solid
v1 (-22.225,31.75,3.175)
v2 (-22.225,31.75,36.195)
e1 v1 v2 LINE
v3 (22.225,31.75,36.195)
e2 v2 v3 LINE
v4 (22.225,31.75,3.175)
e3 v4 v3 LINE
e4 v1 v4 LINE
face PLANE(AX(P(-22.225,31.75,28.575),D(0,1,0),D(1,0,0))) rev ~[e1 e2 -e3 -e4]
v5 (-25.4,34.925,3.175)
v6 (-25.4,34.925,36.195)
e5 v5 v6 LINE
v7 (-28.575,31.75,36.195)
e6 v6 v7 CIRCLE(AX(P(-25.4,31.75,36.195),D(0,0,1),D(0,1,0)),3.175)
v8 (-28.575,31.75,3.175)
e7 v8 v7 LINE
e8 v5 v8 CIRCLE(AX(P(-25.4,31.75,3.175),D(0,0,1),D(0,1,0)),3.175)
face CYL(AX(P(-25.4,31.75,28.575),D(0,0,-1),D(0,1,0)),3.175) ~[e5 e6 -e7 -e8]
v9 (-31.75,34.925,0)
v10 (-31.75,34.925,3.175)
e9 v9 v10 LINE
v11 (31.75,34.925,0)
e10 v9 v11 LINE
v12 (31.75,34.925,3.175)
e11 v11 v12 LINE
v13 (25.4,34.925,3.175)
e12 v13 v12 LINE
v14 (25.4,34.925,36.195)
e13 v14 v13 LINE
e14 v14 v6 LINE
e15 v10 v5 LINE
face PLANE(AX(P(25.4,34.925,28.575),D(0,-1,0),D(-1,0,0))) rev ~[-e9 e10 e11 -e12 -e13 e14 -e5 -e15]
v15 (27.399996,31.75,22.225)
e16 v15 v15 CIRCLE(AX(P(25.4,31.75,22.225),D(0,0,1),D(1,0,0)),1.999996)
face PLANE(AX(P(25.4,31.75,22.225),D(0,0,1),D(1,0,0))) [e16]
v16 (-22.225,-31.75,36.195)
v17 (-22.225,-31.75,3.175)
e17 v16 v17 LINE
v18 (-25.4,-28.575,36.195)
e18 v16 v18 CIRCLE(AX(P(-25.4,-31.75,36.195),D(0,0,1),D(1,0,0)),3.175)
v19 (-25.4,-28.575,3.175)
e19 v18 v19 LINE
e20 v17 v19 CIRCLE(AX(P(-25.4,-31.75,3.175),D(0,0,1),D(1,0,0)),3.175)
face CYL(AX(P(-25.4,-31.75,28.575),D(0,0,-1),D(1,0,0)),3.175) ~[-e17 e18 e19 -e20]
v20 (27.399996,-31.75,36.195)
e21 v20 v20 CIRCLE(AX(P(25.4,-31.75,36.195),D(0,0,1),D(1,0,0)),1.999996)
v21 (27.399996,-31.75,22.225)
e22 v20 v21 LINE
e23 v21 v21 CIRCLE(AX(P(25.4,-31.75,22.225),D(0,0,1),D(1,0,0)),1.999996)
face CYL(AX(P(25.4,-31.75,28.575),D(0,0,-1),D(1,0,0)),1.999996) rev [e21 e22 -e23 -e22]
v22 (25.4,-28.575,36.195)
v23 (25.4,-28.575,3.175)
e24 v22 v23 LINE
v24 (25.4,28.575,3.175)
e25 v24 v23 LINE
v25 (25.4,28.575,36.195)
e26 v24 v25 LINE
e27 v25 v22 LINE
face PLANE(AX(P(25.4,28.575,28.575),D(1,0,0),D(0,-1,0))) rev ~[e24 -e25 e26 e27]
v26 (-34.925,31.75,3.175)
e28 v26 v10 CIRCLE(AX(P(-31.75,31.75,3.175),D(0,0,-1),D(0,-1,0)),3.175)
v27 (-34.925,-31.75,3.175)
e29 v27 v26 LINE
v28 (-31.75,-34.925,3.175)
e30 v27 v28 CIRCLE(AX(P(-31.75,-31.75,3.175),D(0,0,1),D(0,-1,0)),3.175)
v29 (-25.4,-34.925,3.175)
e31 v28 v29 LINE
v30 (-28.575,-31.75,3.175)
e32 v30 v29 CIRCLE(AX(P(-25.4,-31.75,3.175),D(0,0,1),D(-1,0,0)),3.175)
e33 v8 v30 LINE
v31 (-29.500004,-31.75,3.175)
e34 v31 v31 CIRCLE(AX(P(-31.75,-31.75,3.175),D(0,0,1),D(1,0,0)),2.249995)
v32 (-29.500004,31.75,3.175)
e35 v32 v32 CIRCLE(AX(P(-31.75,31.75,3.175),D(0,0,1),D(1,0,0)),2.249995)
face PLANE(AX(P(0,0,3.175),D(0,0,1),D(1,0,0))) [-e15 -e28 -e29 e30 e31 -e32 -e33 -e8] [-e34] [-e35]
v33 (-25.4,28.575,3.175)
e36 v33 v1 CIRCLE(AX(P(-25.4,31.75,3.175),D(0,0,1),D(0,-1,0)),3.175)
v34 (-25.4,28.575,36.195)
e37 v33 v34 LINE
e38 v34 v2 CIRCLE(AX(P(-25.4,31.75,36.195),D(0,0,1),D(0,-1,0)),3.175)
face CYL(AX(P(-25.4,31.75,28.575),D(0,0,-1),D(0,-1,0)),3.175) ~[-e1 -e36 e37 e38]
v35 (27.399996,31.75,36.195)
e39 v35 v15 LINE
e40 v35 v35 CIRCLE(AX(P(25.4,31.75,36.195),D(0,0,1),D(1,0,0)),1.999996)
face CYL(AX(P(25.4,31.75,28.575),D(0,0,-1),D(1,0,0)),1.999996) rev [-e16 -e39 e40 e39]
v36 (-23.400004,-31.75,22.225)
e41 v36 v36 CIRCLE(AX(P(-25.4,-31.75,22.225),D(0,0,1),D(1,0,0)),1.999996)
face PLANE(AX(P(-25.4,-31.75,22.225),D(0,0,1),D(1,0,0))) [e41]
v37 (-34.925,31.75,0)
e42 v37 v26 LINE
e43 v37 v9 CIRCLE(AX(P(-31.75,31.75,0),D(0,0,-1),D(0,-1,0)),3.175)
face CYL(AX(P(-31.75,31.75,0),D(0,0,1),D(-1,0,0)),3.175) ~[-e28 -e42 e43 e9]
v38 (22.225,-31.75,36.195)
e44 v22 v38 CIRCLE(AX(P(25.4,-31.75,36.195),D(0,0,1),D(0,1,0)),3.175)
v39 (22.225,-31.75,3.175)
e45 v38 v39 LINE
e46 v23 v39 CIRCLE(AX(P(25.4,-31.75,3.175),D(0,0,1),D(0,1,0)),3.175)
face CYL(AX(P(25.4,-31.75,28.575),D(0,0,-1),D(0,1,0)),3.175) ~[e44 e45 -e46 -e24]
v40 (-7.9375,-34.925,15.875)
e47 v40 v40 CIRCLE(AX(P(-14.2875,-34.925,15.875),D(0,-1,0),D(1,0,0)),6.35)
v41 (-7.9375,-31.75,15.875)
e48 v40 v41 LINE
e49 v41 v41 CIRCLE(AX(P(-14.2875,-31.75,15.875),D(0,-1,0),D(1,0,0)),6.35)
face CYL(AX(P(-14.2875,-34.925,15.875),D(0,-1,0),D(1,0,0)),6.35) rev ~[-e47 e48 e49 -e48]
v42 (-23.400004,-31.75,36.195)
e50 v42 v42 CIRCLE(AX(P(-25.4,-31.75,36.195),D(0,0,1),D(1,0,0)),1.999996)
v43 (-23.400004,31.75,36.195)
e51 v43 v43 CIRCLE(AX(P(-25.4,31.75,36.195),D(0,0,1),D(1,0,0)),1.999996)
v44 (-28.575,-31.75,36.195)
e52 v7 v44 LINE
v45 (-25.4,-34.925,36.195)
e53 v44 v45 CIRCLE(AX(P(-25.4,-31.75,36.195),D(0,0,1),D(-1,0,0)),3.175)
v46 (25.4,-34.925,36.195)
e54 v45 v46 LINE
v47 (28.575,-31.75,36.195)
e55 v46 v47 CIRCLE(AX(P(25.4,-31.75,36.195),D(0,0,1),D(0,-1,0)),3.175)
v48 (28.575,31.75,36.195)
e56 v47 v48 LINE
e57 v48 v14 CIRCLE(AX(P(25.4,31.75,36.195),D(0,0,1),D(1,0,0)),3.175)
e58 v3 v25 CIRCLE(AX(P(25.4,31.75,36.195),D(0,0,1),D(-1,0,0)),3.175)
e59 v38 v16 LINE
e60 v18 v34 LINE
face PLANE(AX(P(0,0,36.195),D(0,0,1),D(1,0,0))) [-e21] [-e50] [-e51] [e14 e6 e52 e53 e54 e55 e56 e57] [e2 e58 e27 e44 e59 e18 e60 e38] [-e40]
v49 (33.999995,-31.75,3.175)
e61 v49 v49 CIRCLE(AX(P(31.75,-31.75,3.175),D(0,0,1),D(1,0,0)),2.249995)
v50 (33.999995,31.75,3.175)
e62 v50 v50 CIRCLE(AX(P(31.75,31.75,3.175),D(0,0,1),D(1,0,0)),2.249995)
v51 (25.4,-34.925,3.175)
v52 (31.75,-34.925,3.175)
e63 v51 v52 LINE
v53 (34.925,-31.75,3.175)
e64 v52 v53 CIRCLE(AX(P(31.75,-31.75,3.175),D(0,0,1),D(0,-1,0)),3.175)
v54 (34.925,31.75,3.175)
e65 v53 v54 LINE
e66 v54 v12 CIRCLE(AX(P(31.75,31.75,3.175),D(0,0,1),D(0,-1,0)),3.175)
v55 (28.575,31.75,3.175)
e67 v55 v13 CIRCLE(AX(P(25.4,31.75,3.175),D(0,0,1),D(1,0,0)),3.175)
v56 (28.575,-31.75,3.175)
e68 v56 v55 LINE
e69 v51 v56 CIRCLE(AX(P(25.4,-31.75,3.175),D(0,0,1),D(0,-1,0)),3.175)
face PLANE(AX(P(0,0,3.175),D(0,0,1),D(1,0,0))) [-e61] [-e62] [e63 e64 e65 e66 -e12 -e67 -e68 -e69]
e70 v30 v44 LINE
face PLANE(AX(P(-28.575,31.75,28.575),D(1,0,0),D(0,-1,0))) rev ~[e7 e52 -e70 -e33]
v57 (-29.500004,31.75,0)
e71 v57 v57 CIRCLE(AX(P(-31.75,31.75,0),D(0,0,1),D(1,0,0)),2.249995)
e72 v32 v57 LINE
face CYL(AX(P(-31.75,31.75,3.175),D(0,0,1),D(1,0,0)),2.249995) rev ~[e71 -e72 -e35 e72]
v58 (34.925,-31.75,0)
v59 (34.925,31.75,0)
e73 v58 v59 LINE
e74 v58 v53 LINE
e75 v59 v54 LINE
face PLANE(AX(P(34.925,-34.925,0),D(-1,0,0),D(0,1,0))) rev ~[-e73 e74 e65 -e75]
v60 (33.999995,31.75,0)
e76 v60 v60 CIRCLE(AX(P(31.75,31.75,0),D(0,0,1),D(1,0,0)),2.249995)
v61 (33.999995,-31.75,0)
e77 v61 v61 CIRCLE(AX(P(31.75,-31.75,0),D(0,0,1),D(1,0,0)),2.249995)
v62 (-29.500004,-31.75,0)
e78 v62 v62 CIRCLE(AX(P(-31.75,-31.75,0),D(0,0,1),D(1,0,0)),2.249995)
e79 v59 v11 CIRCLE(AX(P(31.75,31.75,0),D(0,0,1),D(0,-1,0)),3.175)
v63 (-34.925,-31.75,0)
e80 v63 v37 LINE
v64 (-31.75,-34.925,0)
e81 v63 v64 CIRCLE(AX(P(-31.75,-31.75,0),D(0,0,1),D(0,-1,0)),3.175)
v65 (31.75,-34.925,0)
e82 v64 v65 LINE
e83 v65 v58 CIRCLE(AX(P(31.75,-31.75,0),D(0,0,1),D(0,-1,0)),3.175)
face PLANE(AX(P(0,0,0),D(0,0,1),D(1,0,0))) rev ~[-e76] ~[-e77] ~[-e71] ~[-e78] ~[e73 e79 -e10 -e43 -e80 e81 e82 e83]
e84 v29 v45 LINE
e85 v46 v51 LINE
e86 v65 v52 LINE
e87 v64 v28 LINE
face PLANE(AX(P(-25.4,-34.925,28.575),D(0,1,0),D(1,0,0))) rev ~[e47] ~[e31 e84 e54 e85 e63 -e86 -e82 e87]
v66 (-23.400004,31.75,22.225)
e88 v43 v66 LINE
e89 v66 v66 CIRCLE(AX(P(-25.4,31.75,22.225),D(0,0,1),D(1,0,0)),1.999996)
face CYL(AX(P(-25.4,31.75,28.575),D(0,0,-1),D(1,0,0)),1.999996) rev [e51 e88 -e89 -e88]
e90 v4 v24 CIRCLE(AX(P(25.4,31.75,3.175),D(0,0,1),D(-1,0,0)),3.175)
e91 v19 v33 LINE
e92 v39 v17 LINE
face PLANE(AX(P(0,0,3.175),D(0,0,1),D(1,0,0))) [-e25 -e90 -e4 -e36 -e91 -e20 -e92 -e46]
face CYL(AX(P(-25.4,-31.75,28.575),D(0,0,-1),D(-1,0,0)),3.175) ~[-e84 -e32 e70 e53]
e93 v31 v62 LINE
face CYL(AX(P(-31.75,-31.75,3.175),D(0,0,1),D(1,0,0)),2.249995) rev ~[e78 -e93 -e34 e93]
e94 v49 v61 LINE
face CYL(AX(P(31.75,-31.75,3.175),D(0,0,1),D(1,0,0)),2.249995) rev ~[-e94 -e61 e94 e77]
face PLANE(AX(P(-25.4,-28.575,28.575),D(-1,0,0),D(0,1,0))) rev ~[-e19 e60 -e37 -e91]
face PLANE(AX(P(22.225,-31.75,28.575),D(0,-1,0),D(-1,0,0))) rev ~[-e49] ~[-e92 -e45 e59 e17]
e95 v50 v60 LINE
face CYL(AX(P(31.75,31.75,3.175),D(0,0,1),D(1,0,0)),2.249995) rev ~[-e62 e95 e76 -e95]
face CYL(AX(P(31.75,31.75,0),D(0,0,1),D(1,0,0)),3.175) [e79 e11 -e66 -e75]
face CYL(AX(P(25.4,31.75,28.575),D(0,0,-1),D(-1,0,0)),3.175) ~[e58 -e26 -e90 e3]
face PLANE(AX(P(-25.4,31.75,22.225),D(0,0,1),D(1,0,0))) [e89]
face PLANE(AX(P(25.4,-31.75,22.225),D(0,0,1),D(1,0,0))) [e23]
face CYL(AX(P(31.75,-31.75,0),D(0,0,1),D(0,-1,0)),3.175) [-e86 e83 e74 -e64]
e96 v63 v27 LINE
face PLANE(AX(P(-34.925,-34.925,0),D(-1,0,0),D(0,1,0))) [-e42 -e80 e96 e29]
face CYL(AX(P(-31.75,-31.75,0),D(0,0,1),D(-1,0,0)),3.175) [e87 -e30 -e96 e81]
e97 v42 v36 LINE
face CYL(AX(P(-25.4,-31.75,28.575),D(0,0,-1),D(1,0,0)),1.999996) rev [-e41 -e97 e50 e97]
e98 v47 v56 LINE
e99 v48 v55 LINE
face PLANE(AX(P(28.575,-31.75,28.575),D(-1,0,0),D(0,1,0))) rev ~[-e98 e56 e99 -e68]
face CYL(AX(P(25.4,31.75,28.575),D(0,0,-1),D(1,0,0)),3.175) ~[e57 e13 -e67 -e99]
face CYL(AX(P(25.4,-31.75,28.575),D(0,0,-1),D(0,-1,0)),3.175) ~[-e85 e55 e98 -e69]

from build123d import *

# Parameters (mm, degrees)
F0_W          = 69.85
F0_H          = 69.85
F1_DEPTH      = 3.175
F2_R          = 3.175
F3_R          = 2.2499955
F4_DEPTH      = 25.4
F4_DEPTH_BACK = 101
F6_DEPTH      = 25.4
F7_R          = 1.999996
F8_DEPTH      = 6.35
F9_R          = 6.35
F10_DEPTH     = 3.175
F11_DEPTH     = 7.62


# Not quite as in the source:
# - an extrude ends at something that could not be found from the text; its depth is read off the source's solid


with BuildPart() as f1:
    # F0 (on Top) → F1 (new body)
    with BuildSketch(Plane.XY):
        Rectangle(F0_W, F0_H)
    extrude(amount=F1_DEPTH)

    # F2
    f2_edges = [f1.edges().sort_by_distance(p)[0] for p in [
        (-34.925, -34.925, 1.5875),
        (34.925, -34.925, 1.5875),
        (34.925, 34.925, 1.5875),
        (-34.925, 34.925, 1.5875),
    ]]
    fillet(f2_edges, radius=F2_R)

    # F3 (on face) → F4 (cut, two sides)
    with BuildSketch(Plane.XY.offset(3.175)) as f4_sk:
        with Locations((-31.75, 31.75)):
            Circle(F3_R)
        with Locations((31.75, 31.75)):
            Circle(F3_R)
        with Locations((31.75, -31.75)):
            Circle(F3_R)
        with Locations((-31.75, -31.75)):
            Circle(F3_R)
    extrude(amount=-F4_DEPTH, mode=Mode.SUBTRACT)
    extrude(f4_sk.sketch, amount=F4_DEPTH_BACK, mode=Mode.SUBTRACT)

    # F5 (on face) → F6 (join)
    with BuildSketch(Plane.XY.offset(3.175)):
        with BuildLine():
            Line((25.4, 34.925), (-25.4, 34.925))
            ThreePointArc((-25.4, 34.925), (-27.6450640303, 33.9950640303), (-28.575, 31.75))
            Line((-28.575, 31.75), (-28.575, -31.75))
            ThreePointArc((-28.575, -31.75), (-27.6450640303, -33.9950640303), (-25.4, -34.925))
            Line((-25.4, -34.925), (25.4, -34.925))
            ThreePointArc((25.4, -34.925), (27.6450640303, -33.9950640303), (28.575, -31.75))
            Line((28.575, -31.75), (28.575, 31.75))
            ThreePointArc((28.575, 31.75), (27.6450640303, 33.9950640303), (25.4, 34.925))
        make_face()
        with BuildLine():
            ThreePointArc((-25.4, 28.575), (-23.1549359697, 29.5049359697), (-22.225, 31.75))
            Line((-22.225, 31.75), (22.225, 31.75))
            ThreePointArc((22.225, 31.75), (23.1549359697, 29.5049359697), (25.4, 28.575))
            Line((25.4, 28.575), (25.4, -28.575))
            ThreePointArc((25.4, -28.575), (23.1549359697, -29.5049359697), (22.225, -31.75))
            Line((22.225, -31.75), (-22.225, -31.75))
            ThreePointArc((-22.225, -31.75), (-23.1549359697, -29.5049359697), (-25.4, -28.575))
            Line((-25.4, -28.575), (-25.4, 28.575))
        make_face(mode=Mode.SUBTRACT)
    extrude(amount=F6_DEPTH)

    # F7 (on face) → F8 (cut)
    with BuildSketch(Plane.XY.offset(28.575)):
        with Locations((-25.4, 31.75)):
            Circle(F7_R)
        with Locations((25.4, 31.75)):
            Circle(F7_R)
        with Locations((25.4, -31.75)):
            Circle(F7_R)
        with Locations((-25.4, -31.75)):
            Circle(F7_R)
    extrude(amount=-F8_DEPTH, mode=Mode.SUBTRACT)

    # F9 (on face) → F10 (cut, through all)
    with BuildSketch(Plane.XZ.offset(34.925)):
        with Locations((-14.2875, 15.875)):
            Circle(F9_R)
    extrude(amount=-F10_DEPTH, mode=Mode.SUBTRACT)

    # F11 (add): a face of the model
    f11_faces = [f1.faces().sort_by_distance(p)[0] for p in [
        (0, 34.0224954294, 28.575),
    ]]
    extrude(f11_faces, amount=F11_DEPTH)


solid = f1.part
